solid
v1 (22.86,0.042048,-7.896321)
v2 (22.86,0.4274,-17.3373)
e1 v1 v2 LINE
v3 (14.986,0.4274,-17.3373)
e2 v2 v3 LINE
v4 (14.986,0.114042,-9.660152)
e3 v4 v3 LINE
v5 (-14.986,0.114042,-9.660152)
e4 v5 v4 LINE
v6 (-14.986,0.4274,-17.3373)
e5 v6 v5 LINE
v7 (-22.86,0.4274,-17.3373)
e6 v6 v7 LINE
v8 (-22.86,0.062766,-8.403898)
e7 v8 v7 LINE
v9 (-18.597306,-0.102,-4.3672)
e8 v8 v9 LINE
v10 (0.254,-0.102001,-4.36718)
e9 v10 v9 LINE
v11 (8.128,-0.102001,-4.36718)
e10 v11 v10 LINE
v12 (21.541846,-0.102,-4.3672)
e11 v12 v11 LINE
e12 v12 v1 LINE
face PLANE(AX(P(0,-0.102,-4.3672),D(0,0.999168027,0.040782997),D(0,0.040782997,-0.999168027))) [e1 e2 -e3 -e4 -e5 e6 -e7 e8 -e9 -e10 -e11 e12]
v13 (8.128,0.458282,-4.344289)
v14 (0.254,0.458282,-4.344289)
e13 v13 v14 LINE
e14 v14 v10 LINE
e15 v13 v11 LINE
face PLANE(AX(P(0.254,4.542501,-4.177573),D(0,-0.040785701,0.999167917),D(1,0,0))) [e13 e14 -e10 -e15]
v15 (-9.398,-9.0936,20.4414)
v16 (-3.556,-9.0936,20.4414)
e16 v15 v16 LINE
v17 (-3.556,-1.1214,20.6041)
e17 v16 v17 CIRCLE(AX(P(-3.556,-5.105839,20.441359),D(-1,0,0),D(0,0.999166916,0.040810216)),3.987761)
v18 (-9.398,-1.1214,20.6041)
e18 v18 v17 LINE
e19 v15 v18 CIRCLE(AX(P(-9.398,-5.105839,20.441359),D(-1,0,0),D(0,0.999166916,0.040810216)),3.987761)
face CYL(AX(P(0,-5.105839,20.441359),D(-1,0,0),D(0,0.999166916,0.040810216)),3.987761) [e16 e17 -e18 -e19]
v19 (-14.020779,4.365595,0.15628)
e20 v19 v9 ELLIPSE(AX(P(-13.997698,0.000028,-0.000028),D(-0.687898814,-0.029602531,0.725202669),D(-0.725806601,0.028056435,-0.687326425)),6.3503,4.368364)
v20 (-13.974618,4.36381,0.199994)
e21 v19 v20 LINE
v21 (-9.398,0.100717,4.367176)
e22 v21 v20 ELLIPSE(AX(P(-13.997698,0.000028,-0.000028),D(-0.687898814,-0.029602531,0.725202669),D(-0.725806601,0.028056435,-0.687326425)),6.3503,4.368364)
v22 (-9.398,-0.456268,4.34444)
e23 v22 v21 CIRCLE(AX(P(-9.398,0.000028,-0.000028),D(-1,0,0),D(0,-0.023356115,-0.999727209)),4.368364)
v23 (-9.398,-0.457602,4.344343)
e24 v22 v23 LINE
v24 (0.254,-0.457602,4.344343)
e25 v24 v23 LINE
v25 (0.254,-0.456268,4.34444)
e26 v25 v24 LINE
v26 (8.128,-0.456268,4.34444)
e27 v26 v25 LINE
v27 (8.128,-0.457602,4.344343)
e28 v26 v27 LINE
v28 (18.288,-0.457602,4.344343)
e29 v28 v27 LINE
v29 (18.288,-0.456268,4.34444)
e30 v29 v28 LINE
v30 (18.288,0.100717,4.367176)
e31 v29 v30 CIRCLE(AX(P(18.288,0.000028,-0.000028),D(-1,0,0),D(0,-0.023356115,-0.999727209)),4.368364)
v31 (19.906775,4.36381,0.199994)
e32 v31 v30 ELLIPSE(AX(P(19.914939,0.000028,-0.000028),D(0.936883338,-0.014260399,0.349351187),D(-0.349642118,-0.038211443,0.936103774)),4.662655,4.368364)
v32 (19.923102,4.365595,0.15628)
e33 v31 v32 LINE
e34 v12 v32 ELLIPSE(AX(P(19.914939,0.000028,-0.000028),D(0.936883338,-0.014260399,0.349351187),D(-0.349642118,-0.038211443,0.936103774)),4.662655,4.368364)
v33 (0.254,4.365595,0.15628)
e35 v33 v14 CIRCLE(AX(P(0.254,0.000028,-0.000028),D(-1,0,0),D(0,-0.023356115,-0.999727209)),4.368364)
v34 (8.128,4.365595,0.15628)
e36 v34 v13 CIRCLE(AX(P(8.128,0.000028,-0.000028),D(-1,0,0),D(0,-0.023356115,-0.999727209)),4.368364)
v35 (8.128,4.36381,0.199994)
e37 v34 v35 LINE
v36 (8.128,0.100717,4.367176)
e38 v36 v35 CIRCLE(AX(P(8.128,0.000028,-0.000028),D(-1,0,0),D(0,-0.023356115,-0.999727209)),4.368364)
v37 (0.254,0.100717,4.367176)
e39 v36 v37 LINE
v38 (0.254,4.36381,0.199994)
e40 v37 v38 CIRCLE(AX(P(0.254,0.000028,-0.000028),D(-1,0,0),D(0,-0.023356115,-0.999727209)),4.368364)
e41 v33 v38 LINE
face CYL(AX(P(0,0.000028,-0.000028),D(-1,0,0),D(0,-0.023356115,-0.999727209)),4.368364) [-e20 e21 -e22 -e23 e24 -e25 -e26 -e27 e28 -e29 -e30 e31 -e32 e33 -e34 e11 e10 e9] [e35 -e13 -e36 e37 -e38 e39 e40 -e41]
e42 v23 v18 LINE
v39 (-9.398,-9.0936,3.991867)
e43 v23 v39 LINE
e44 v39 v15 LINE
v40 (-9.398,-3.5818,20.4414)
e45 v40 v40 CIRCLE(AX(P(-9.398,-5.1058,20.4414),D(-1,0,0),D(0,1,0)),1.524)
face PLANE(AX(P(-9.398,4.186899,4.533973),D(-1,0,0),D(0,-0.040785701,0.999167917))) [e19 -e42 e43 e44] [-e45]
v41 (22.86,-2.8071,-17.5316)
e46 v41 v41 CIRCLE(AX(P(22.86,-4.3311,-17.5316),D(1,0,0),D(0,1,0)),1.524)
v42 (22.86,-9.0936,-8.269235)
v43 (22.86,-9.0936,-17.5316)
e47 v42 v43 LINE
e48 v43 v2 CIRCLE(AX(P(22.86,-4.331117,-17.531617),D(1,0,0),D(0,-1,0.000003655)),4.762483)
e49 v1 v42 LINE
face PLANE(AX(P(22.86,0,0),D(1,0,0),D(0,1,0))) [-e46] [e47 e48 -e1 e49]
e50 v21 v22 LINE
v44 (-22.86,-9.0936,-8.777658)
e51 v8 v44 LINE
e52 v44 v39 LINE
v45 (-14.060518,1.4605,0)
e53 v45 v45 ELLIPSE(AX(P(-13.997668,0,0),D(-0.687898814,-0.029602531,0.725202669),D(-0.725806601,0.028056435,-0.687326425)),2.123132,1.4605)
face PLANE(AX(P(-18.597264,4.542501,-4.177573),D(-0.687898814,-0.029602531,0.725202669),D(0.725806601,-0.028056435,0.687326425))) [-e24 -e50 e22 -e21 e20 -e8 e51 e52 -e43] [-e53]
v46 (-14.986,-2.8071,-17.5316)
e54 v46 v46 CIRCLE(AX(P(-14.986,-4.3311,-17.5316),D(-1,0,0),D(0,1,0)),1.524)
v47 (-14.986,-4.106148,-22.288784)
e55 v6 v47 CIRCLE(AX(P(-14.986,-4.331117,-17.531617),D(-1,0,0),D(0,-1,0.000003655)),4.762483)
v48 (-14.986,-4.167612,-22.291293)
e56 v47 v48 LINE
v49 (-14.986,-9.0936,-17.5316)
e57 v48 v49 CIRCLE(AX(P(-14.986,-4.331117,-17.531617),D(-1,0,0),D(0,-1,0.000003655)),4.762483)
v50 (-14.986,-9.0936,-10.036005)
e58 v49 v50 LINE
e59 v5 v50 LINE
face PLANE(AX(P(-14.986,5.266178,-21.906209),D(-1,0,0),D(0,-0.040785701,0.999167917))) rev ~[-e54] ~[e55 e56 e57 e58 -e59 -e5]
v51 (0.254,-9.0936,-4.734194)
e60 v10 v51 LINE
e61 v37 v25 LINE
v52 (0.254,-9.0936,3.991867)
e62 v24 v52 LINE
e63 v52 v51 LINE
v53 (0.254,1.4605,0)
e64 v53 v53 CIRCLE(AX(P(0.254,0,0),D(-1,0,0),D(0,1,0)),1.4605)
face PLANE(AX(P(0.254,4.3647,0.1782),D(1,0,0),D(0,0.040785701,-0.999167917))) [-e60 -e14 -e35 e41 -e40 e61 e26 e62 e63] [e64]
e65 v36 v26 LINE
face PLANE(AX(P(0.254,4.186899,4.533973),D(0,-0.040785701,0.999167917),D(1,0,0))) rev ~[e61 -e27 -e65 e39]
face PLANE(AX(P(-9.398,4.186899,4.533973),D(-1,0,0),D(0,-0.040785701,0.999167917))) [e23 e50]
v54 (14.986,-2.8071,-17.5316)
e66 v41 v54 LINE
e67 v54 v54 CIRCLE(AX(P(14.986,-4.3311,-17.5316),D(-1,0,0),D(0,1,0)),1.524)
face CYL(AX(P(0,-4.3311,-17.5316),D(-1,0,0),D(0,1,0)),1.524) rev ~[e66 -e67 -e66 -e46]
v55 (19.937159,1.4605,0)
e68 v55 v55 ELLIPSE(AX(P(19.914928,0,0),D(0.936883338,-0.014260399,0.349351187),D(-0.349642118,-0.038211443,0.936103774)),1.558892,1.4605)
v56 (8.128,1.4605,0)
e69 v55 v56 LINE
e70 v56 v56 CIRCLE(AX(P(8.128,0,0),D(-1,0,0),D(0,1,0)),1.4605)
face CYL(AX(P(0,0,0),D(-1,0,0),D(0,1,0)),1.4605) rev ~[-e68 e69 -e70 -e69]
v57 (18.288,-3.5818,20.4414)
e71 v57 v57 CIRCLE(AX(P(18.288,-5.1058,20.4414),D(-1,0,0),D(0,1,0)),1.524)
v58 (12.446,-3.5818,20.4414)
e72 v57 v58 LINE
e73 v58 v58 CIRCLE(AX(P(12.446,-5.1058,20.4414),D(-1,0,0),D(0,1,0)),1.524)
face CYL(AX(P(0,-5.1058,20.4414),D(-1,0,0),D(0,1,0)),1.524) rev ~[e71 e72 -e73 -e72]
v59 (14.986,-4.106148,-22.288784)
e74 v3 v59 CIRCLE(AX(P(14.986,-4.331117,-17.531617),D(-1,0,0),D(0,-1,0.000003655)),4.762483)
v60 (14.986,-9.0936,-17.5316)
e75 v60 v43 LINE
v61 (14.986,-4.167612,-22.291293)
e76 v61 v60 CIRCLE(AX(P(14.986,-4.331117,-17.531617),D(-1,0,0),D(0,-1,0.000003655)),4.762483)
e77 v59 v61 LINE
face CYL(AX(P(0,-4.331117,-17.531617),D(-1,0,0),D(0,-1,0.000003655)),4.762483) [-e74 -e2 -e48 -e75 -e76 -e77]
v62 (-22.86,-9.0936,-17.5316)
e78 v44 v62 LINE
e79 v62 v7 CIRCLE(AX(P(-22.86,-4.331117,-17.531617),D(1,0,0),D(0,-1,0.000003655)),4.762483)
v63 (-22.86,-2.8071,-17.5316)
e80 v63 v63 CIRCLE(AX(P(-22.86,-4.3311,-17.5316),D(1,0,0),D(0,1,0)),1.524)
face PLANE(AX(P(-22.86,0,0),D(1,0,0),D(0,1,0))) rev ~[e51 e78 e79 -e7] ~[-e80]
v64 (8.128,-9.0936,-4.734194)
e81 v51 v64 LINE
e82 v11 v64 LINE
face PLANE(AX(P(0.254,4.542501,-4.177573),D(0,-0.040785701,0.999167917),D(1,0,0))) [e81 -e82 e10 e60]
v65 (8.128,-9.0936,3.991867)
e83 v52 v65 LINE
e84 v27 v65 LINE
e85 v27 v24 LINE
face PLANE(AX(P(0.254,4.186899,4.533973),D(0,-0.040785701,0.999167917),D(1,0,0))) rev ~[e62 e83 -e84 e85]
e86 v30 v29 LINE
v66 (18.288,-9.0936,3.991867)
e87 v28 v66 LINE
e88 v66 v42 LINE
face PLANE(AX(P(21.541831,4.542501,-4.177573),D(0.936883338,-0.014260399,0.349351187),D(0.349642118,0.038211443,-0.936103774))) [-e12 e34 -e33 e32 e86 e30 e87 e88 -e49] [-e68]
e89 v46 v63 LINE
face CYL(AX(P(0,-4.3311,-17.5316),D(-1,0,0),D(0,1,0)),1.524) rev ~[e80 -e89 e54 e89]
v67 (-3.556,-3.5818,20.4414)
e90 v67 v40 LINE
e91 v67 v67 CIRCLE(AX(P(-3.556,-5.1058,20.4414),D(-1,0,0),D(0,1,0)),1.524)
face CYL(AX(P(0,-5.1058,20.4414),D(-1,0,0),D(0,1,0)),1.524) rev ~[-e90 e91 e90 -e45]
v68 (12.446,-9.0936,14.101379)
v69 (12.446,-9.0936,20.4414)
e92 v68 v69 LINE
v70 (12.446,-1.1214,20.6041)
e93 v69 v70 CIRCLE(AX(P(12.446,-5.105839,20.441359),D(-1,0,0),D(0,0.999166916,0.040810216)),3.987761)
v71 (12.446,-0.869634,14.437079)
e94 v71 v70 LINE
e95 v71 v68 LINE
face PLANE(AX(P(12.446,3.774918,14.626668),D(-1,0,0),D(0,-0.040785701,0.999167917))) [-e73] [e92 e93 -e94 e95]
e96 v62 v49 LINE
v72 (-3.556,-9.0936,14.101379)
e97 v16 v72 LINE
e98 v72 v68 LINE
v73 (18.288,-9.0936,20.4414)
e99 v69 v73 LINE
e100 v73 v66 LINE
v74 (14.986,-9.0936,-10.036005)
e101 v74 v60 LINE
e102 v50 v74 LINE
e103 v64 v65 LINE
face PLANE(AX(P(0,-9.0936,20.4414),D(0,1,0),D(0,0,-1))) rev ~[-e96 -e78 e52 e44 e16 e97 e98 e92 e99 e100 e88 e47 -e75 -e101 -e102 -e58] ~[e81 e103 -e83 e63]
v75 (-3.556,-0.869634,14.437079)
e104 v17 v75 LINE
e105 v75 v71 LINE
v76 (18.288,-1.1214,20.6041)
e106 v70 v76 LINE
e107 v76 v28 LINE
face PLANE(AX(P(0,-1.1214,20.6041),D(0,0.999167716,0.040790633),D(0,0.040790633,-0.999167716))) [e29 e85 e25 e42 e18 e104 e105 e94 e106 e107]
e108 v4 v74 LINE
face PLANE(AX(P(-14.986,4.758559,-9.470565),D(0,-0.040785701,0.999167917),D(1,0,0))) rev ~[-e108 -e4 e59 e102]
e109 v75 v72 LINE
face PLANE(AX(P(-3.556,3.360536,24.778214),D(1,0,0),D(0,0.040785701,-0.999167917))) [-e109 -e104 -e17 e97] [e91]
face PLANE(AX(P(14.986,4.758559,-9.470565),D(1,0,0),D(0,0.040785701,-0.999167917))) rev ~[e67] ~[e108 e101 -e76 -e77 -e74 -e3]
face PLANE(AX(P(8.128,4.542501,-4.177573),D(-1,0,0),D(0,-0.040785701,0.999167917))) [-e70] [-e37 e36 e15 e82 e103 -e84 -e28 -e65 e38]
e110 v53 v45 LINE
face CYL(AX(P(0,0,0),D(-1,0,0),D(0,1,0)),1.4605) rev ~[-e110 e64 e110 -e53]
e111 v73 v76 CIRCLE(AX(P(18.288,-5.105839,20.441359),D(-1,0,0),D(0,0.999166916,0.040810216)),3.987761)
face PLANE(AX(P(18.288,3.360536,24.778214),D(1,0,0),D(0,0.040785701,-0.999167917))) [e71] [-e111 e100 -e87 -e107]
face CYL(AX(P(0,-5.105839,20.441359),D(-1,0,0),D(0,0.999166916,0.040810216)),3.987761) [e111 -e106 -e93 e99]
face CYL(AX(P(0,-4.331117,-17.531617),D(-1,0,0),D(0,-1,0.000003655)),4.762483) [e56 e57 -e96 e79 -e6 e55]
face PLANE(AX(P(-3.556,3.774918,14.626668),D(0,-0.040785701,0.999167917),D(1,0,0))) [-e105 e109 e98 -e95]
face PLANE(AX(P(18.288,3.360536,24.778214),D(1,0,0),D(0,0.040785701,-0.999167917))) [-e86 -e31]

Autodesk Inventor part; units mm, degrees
sketch "Sketch3" plane through (0, 0, 0) normal (1, 0, 0) x (0, 1, 0)
  arc A0 (-1.1214, 20.6041) -> (-9.0936, 20.4414) centre (-5.1058, 20.4414) ccw
  circle A1 centre (-5.1058, 20.4414) radius 1.524
  arc A2 (-9.0936, -17.5316) -> (0.4274, -17.3373) centre (-4.3311, -17.5316) ccw
  circle A3 centre (-4.3311, -17.5316) radius 1.524
  arc A4 (-0.102, -4.3672) -> (-0.4576, 4.3443) centre (0, 0) ccw
  circle A5 centre (0, 0) radius 1.4605
  line L0 (-9.0936, 20.4414) -> (-9.0936, -17.5316)
  line L1 (-1.1214, 20.6041) -> (-0.4576, 4.3443)
  line L2 (-0.102, -4.3672) -> (0.4274, -17.3373)
  line L3 (0, 0) -> (0, 35.9976) construction
  line L4 (0, 0) -> (20.0348, 0) construction
  line L5 (9.2339, 18.9174) -> (-10.5183, 18.9174) construction
  line L6 (11.5384, -16.0076) -> (-16.1147, -16.0076) construction
  line L7 (4.3684, 5.3055) -> (4.3684, -5.6899) construction
  line L8 (-1.4605, 3.5835) -> (-1.4605, -5.6899) construction
  dimension "d5" = 2.921
  dimension "d38" = 3.048
  dimension "d39" = 3.9878
  dimension "d40" = 4.7625
  dimension "d41" = 34.925
  dimension "d42" = 13.462
  dimension "d43" = 8.636
  dimension "d44" = 8.9916
  dimension "d45" = 7.6331
extrude "Extrusion1" add sketch "Sketch3" along normal mid plane 45.72
ref_plane "Work Plane1" through (0, 4.3647, 0.1782) normal (0, 0.9991679, 0.0407857) x (-1, 0, 0)
sketch "Sketch5" plane through (0, 4.3647, 0.1782) normal (0, 0.9991679, 0.0407857) x (-1, 0, 0)
  line L0 (-22.86, -7.8915) -> (-22.86, 24.6205)
  line L1 (-22.86, 24.6205) -> (-18.288, 24.6205)
  line L2 (-18.288, 24.6205) -> (-18.288, 4.3594)
  line L3 (-18.288, 4.3594) -> (-22.86, -7.8915)
  line L4 (-22.86, 20.6327) -> (-22.86, 4.3594) projected
  line L5 (22.86, 0) -> (-22.86, 0) projected
  line L6 (22.86, 24.6205) -> (-22.86, 24.6205) projected
  line L7 (22.86, 4.3594) -> (-22.86, 4.3594) projected
  line L8 (-22.86, 4.3594) -> (-22.86, -4.3594) projected
  line L9 (22.86, -4.3594) -> (-22.86, -4.3594) projected
  line L10 (22.86, -4.3594) -> (22.86, 4.3594) projected
  line L11 (22.86, 4.3594) -> (-22.86, 4.3594) projected
  line L12 (22.86, 24.6205) -> (22.86, -8.3995)
  line L13 (22.86, -8.3995) -> (9.398, 4.3594)
  line L14 (9.398, 4.3594) -> (9.398, 24.6205)
  line L15 (22.86, -22.1028) -> (-22.86, -22.1028) projected
  line L16 (14.986, -9.6568) -> (-14.986, -9.6568)
  line L17 (-14.986, -9.6568) -> (-14.986, -22.1028)
  line L18 (-14.986, -22.1028) -> (14.986, -22.1028)
  line L19 (14.986, -22.1028) -> (14.986, -9.6568)
  line L20 (3.556, 14.4605) -> (-12.446, 14.4605)
  line L21 (-12.446, 14.4605) -> (-12.446, 24.6205)
  line L22 (-12.446, 24.6205) -> (3.556, 24.6205)
  line L23 (3.556, 24.6205) -> (3.556, 14.4605)
  line L24 (-22.86, -4.3594) -> (-22.86, -17.3403) projected
  line L25 (22.86, -17.3403) -> (22.86, -4.3594) projected
  line L26 (-8.128, 4.3594) -> (-0.254, 4.3594)
  line L27 (-0.254, 4.3594) -> (-0.254, -4.3594)
  line L28 (-0.254, -4.3594) -> (-8.128, -4.3594)
  line L29 (-8.128, -4.3594) -> (-8.128, 4.3594)
  point P0 (0, 0)
  dimension "d21" = 32.512
  dimension "d22" = 4.572
  dimension "d26" = 33.02
  dimension "d27" = 5.842
  dimension "d28" = 5.842
  dimension "d29" = 10.16
  dimension "d31" = 12.446
  dimension "d32" = 7.874
  dimension "d33" = 7.874
  dimension "d34" = 10.16
  dimension "d36" = 29.972
  dimension "d37" = 16.002
extrude "Extrusion2" cut sketch "Sketch5" against normal up to surface contours L0 L9 L3 | L0 L5 L3 L9 | L0 L7 L3 L5 | L29 L5 L27 L9 | L0 L1 L2 L7 | L29 L7 L27 L5 | L13 L5 L10 L9 | L9 L12 L13 | L6 L23 L20 L21 | L13 L7 L10 L5 | L14 L6 L12 L7 | L15 L17 L16 L19 surface through (0, -9.0936, -17.5316) normal (0, -1, 0)
ref_plane "Work Plane2" through (0, -5.1058, 24.4292) normal (0, 0, 1) x (1, 0, 0)
ref_plane "Work Plane3" through (0, -4.3311, -22.2941) normal (0, 0, 1) x (1, 0, 0)
properties part number "Transmission Plate - Top"
